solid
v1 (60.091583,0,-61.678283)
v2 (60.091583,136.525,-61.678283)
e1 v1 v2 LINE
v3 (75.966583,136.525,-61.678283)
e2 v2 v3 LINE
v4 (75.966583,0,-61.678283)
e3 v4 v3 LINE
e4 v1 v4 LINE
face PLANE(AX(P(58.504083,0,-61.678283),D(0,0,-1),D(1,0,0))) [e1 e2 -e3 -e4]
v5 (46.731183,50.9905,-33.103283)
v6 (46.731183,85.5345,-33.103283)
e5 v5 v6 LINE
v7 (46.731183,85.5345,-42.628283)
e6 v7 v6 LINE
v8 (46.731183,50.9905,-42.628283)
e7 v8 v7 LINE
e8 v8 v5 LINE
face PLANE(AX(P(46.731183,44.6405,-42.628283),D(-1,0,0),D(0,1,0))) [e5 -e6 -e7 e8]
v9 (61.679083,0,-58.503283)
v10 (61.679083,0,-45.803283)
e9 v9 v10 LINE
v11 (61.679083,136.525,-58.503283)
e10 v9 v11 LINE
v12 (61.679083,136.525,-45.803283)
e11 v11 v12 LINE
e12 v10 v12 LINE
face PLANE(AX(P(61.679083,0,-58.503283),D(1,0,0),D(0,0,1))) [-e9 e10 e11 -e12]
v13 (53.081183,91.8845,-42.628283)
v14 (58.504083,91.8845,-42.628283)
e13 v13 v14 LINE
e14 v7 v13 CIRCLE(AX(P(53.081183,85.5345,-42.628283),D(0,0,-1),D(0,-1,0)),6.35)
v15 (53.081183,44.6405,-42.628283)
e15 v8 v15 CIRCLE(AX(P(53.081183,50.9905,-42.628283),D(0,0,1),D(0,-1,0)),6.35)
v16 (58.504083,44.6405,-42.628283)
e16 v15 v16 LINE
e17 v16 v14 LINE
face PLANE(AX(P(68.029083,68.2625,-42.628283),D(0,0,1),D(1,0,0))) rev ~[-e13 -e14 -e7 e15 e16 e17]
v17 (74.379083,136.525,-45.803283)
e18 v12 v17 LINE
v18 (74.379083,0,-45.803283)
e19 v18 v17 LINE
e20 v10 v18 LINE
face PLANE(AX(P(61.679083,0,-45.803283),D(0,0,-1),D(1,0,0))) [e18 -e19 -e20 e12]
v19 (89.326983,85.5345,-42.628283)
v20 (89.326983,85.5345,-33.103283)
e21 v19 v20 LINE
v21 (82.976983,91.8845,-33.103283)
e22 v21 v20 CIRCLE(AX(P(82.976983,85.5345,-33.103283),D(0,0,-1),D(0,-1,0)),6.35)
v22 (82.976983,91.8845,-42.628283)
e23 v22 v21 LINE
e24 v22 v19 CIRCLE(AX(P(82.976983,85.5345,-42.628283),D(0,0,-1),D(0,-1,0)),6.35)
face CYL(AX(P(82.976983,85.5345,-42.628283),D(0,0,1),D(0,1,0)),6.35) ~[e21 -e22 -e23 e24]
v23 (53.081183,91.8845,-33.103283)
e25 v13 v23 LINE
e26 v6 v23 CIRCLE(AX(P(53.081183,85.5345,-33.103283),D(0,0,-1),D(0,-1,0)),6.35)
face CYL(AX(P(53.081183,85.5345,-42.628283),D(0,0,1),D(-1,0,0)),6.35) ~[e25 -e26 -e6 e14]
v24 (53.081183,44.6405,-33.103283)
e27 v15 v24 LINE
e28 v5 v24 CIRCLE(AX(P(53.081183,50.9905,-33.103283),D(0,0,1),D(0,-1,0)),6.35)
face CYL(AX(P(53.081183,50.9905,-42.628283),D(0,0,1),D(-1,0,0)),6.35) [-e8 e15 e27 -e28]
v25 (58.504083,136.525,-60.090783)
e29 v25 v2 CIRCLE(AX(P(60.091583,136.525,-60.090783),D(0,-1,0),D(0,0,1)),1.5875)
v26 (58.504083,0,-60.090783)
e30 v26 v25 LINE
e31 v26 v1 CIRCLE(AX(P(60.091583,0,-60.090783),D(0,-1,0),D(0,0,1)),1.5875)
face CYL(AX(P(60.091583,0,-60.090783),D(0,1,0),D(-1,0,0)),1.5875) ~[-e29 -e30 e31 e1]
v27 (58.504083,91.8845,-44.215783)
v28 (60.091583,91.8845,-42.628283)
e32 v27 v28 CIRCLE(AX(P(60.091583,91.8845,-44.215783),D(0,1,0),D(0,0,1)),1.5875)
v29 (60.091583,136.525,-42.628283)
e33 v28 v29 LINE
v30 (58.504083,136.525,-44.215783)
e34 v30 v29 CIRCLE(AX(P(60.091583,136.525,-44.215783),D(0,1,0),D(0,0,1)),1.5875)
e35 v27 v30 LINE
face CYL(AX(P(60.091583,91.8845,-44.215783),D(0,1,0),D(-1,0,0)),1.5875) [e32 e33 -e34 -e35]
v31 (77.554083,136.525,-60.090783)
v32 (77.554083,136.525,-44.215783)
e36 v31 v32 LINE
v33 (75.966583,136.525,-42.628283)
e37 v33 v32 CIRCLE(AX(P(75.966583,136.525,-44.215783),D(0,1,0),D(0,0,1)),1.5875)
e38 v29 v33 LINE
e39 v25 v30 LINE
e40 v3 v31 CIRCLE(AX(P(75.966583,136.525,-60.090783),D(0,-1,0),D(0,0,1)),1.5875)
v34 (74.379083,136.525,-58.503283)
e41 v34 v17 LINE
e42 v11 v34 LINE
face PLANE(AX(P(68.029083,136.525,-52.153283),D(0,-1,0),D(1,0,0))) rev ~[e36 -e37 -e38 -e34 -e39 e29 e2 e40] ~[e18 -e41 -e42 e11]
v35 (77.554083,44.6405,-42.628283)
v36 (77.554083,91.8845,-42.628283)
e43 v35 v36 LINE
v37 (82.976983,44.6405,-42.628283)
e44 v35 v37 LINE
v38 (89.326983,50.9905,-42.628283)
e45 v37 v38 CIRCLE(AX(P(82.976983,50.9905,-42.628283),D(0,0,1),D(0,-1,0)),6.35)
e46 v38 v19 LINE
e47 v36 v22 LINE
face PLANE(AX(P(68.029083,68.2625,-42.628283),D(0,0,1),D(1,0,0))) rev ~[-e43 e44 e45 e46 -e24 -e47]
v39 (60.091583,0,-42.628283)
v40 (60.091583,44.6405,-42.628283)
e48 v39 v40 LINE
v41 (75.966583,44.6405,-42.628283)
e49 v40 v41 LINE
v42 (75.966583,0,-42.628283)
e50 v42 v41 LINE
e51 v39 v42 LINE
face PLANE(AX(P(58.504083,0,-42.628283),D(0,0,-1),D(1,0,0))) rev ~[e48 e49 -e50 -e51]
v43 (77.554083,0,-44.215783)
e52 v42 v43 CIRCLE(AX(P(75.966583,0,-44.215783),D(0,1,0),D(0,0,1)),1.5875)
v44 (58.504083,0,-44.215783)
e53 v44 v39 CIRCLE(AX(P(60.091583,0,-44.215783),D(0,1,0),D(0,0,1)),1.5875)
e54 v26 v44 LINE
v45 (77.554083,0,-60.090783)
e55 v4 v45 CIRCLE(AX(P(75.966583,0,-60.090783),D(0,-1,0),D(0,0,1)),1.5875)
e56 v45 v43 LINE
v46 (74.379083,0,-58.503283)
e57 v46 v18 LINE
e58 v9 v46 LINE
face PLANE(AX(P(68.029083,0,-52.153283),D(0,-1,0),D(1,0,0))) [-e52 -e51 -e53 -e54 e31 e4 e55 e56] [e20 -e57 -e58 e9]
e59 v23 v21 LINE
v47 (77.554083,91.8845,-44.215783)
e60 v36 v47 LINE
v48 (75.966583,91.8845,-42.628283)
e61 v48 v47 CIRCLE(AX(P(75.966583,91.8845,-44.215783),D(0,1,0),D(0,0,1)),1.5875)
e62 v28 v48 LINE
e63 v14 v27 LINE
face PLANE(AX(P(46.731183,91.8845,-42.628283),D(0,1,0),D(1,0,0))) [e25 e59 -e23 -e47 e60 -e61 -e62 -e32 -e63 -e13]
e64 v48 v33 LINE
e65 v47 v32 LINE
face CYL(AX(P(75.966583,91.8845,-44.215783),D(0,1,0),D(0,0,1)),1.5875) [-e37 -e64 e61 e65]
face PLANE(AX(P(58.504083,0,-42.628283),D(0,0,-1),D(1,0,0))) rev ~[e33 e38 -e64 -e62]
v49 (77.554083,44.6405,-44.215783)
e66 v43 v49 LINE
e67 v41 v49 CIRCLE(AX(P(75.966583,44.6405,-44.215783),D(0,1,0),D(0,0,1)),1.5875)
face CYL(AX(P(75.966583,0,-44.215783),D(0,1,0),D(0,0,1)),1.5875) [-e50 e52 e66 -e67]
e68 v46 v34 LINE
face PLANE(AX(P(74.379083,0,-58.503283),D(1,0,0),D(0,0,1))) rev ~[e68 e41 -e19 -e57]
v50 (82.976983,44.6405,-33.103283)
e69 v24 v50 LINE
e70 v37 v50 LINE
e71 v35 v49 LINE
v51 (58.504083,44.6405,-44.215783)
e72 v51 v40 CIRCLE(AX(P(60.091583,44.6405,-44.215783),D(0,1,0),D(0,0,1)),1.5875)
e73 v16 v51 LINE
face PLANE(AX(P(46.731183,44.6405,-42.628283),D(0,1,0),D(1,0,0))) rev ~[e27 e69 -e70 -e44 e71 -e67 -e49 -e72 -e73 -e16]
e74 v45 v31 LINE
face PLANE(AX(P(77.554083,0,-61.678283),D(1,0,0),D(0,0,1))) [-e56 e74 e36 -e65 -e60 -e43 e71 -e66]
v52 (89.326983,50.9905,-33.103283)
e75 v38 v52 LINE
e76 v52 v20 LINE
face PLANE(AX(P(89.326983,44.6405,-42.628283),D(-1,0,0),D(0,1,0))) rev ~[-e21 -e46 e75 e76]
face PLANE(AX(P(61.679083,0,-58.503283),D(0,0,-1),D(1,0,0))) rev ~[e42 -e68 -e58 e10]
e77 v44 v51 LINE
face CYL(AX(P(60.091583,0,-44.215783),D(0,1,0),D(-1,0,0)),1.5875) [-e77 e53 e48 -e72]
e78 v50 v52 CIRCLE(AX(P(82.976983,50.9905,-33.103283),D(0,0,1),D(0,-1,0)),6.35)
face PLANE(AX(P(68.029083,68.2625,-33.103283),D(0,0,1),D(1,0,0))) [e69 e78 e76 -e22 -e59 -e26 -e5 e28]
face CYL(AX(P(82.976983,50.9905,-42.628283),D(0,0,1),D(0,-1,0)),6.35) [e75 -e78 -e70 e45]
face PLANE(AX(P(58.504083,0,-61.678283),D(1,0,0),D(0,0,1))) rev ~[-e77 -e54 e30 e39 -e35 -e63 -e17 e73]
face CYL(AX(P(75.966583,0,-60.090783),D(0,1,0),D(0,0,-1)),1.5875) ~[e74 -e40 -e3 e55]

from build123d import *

# Parameters (mm, degrees)
F0_W     = 19.05
F0_H     = 19.05
F0_W_2   = 12.7
F0_H_2   = 12.7
F1_DEPTH = 136.525
F2_W     = 42.5958
F2_H     = 47.244
F3_DEPTH = 9.525
F4_R     = 6.35
F5_R     = 1.5875


with BuildPart() as f1:
    # F0 (on Front) → F1 (new body)
    with BuildSketch(Plane.XZ):
        with Locations((68.0290833116, -52.153282702)):
            Rectangle(F0_W, F0_H)
        with Locations((68.0290833116, -52.153282702)):
            Rectangle(F0_W_2, F0_H_2, mode=Mode.SUBTRACT)
    extrude(amount=-F1_DEPTH)

    # F2 (on face) → F3 (join)
    with BuildSketch(Plane.XY.offset(-42.628282702)):
        with Locations((68.0290833116, 68.2625)):
            Rectangle(F2_W, F2_H)
    extrude(amount=F3_DEPTH)

    # F4
    f4_edges = [f1.edges().sort_by_distance(p)[0] for p in [
        (89.326983, 44.6405, -37.865783),
        (89.326983, 91.8845, -37.865783),
        (46.731183, 44.6405, -37.865783),
        (46.731183, 91.8845, -37.865783),
    ]]
    fillet(f4_edges, radius=F4_R)

    # F5
    f5_edges = [f1.edges().sort_by_distance(p)[0] for p in [
        (77.554083, 68.2625, -61.678283),
        (58.504083, 68.2625, -61.678283),
        (58.504083, 22.32025, -42.628283),
        (77.554083, 22.32025, -42.628283),
        (58.504083, 114.20475, -42.628283),
        (77.554083, 114.20475, -42.628283),
    ]]
    fillet(f5_edges, radius=F5_R)


solid = f1.part
